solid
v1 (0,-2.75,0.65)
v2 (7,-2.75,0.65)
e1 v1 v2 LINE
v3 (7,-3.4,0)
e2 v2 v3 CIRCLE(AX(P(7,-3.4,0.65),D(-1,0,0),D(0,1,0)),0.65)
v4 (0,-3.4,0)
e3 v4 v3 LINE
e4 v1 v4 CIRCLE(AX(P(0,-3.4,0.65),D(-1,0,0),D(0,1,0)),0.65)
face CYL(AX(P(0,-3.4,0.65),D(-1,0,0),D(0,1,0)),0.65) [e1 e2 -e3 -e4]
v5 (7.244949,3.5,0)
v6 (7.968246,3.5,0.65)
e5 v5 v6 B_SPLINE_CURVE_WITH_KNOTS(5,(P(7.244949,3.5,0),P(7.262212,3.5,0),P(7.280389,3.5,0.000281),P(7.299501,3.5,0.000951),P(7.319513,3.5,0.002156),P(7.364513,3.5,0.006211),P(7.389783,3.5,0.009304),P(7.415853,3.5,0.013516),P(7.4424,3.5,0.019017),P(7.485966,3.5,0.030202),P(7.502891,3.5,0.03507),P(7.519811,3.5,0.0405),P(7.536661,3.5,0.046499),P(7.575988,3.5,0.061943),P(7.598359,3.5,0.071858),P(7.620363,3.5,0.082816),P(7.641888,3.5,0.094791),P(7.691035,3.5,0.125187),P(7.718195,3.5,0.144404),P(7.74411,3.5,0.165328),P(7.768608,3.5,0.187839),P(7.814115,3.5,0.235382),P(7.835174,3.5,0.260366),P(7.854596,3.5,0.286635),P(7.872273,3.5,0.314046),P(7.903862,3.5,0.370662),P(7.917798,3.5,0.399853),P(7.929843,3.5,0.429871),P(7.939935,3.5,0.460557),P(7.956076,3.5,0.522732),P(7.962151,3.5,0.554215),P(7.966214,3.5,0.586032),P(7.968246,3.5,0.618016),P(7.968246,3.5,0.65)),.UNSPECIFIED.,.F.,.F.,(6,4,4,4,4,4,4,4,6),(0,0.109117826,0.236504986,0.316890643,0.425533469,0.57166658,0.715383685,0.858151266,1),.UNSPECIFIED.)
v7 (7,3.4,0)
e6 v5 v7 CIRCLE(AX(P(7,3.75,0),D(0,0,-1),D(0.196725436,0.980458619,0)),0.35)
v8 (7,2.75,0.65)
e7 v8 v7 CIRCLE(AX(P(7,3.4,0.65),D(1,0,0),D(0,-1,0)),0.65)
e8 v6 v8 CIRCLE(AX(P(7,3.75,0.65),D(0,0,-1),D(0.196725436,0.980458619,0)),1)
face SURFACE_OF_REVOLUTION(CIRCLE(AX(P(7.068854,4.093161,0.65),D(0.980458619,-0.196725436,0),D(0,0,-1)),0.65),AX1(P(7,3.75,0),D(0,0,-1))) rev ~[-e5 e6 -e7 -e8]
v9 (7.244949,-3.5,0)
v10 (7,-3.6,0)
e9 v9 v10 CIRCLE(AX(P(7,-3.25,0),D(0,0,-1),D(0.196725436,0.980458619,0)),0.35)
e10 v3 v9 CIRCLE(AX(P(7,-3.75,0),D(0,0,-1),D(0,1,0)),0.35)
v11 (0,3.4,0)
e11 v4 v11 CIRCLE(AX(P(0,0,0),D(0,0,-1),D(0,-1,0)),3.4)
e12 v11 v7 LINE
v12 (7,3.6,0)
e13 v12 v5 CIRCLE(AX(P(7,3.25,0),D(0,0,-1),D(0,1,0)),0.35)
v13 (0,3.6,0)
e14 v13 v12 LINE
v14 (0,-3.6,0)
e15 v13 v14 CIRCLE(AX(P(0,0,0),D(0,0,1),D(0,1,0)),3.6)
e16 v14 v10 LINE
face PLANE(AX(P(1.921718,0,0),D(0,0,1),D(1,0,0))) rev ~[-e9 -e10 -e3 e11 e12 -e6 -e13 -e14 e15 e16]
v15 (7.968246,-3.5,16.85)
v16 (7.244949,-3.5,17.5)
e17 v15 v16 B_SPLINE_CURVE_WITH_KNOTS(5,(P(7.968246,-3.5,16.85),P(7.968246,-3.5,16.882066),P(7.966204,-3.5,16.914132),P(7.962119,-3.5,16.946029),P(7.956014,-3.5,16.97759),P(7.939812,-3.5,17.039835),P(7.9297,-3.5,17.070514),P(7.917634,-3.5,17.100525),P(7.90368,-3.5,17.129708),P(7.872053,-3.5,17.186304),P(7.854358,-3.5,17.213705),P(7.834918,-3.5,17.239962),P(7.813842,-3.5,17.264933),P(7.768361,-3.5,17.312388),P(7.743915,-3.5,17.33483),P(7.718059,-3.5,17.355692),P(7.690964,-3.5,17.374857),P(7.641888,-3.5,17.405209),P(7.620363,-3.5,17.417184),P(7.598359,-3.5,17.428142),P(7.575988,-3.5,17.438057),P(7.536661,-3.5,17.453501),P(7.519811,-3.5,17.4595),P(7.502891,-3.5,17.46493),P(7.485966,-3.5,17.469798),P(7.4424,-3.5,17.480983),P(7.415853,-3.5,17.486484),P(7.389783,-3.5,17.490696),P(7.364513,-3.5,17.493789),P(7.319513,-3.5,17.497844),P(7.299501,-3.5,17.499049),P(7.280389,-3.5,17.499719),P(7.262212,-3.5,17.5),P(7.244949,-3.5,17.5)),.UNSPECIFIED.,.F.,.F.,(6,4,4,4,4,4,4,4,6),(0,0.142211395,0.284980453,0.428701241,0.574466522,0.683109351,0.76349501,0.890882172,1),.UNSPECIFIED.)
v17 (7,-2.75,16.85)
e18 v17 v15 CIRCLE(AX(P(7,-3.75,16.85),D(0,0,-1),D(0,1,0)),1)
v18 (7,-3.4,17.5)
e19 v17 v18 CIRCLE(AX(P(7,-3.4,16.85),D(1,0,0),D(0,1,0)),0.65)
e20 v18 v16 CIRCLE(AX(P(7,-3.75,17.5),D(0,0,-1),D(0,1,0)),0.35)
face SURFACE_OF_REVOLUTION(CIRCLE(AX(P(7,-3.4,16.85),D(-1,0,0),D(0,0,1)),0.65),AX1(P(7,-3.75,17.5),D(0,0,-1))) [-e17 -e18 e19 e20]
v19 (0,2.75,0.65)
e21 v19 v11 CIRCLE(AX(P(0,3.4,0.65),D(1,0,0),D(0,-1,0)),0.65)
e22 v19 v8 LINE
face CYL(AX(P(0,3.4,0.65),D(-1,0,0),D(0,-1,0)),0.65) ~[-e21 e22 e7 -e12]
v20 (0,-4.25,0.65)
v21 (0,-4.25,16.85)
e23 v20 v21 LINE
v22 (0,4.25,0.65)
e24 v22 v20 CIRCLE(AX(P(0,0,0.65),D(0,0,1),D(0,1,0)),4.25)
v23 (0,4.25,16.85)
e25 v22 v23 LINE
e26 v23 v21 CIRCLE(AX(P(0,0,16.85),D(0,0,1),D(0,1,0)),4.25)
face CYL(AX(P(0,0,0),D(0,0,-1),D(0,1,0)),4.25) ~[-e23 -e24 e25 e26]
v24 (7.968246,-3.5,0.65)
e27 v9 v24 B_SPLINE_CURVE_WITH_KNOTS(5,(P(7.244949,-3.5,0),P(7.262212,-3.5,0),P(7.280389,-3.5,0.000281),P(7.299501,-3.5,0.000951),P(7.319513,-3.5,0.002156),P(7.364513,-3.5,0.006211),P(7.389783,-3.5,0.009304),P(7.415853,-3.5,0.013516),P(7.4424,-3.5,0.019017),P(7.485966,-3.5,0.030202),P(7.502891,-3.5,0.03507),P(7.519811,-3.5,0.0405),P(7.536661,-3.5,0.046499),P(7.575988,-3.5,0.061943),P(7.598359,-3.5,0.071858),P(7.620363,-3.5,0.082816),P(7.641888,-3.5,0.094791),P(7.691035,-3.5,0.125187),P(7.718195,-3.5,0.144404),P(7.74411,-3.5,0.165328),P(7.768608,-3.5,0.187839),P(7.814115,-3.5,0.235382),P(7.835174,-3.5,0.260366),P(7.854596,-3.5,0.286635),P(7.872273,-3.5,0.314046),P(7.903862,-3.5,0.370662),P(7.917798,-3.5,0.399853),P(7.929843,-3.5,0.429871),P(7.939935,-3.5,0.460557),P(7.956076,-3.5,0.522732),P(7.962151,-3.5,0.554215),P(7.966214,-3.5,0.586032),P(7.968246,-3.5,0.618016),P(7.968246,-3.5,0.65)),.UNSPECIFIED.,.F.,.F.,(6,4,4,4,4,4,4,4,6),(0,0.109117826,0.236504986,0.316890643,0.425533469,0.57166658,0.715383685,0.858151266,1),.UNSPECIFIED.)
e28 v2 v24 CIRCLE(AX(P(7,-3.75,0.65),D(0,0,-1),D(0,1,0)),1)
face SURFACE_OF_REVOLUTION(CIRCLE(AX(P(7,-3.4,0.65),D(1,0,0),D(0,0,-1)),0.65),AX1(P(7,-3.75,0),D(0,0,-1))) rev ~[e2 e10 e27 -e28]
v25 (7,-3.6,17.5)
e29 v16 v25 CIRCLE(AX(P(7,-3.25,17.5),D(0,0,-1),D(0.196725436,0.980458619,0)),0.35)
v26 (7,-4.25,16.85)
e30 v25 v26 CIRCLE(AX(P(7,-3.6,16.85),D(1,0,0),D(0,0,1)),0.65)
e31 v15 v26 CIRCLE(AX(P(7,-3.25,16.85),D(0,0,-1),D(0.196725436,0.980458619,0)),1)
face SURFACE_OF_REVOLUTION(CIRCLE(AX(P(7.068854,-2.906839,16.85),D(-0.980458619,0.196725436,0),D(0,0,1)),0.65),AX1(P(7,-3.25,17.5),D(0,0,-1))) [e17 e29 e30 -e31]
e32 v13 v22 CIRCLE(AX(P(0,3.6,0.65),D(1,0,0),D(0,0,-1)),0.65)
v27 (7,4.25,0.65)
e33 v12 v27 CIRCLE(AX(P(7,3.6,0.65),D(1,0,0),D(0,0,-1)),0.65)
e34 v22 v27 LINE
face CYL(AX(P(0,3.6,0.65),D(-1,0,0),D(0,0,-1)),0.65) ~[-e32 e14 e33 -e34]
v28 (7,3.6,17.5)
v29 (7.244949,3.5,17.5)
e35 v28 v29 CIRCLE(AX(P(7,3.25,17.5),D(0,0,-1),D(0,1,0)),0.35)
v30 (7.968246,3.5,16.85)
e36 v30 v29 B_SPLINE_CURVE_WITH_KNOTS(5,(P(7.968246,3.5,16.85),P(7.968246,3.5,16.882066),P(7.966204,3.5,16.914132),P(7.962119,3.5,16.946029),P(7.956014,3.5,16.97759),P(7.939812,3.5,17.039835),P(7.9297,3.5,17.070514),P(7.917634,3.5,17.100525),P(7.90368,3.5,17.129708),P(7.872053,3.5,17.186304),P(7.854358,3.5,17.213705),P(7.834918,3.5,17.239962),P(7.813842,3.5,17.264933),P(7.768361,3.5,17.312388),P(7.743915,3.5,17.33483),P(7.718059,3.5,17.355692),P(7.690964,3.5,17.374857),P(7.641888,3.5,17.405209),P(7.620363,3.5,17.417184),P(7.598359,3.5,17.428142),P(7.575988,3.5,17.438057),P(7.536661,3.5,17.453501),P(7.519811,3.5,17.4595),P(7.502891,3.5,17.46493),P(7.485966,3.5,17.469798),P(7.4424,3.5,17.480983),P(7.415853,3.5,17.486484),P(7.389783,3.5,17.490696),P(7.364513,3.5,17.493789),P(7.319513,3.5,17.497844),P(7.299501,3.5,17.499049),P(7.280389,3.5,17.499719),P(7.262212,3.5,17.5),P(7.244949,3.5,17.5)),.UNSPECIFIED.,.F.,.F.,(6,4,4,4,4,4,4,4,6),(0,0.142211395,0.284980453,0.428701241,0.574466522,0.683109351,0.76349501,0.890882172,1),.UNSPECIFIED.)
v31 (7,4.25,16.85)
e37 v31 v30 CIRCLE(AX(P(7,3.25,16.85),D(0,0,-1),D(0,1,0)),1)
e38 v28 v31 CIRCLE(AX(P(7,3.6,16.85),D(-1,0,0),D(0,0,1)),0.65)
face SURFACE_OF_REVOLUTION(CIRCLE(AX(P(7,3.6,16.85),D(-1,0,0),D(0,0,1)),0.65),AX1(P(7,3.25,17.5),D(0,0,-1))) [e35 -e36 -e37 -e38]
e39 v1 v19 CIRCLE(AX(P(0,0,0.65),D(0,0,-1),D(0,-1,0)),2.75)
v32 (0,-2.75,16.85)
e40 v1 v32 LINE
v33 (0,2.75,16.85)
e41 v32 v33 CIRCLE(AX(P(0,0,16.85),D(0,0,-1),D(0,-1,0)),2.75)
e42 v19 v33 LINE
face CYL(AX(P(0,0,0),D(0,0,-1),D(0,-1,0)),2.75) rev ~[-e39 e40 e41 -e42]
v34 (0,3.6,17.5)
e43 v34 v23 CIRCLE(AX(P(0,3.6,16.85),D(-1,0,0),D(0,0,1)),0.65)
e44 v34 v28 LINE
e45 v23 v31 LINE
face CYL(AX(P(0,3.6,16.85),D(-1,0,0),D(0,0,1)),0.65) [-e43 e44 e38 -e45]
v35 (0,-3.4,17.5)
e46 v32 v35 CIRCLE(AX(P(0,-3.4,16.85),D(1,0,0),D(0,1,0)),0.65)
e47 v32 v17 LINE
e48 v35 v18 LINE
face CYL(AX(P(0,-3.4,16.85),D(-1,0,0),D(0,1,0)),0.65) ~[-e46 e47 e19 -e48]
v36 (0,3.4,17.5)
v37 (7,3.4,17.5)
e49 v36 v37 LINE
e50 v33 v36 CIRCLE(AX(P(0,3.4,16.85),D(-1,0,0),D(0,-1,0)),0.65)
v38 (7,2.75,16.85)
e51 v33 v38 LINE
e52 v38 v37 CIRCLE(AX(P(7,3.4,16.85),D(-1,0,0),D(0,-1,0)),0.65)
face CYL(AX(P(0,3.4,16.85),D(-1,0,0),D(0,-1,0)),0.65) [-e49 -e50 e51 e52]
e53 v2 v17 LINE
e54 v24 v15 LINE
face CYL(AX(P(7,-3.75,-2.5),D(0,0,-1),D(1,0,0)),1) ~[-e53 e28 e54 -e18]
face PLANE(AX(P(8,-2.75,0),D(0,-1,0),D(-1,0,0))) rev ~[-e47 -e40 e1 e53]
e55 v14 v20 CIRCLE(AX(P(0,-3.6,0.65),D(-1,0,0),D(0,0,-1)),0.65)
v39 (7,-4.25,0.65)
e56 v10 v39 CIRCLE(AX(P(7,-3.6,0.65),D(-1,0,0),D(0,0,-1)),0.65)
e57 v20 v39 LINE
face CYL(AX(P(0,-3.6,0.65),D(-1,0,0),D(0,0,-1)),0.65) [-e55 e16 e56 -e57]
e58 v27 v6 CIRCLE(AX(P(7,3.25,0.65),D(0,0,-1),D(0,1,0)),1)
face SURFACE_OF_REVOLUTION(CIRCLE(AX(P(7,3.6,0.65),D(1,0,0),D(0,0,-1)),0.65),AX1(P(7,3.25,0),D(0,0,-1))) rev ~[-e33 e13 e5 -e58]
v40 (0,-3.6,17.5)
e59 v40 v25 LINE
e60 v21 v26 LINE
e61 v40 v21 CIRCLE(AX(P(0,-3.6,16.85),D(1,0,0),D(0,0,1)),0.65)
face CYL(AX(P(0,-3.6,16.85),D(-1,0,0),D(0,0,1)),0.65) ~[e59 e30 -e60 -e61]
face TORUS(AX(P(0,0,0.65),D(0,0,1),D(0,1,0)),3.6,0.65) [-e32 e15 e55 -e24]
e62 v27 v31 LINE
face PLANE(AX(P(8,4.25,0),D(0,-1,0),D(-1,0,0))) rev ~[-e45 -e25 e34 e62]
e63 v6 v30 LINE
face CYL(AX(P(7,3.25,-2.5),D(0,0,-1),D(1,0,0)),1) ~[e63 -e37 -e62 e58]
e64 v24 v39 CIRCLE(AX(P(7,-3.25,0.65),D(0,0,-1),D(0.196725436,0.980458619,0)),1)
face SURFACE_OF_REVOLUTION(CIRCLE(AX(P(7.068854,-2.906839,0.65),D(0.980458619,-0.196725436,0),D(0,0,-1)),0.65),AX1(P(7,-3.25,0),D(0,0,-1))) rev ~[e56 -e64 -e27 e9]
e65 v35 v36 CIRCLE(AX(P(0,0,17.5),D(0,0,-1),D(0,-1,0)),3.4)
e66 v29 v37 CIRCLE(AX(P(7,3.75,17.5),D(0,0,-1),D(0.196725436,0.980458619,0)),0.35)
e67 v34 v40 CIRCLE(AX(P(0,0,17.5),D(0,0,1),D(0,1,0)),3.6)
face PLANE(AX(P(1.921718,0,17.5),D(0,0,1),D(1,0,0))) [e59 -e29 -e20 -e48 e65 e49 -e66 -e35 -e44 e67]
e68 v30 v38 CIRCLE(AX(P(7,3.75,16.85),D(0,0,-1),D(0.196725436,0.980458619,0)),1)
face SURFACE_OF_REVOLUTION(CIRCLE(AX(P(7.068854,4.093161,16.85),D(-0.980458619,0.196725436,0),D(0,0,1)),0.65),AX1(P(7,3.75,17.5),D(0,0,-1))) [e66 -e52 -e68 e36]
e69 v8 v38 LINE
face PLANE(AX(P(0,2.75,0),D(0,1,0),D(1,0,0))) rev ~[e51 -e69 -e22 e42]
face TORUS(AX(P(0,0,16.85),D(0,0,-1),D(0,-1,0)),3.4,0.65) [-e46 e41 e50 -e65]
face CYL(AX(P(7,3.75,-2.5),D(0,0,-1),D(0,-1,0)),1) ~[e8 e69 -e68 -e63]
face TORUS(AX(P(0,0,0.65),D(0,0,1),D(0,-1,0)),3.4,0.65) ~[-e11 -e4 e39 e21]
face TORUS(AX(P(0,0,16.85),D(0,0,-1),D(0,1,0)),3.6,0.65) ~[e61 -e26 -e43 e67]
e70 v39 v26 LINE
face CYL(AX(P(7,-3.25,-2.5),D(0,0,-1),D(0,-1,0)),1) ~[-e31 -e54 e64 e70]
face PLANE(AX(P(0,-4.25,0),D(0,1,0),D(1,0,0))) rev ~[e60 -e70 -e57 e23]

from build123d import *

# Parameters (mm, degrees)
F1_DEPTH     = 17.5
F2_T1_DEPTH  = 22.5
F3_T1_DEPTH  = 7
F3_T4_ANGLE  = 168.6544636073
F3_T6_ANGLE  = 168.6544636073
F3_T8_ANGLE  = 180
F3_T10_ANGLE = 168.6544636073
F3_T12_ANGLE = 168.6544636073
F3_T14_ANGLE = 180
F3_T16_ANGLE = 168.6544636073
F3_T18_ANGLE = 168.6544636073
F3_T20_ANGLE = 180
F3_T22_ANGLE = 168.6544636073
F3_T24_ANGLE = 168.6544636073
F3_T26_ANGLE = 180


# Not quite as in the source:
# - a fillet or chamfer that OpenCascade refuses, or shapes differently, is made with other operations: its cross-section is extruded or revolved along the edge and cut away or added


with BuildPart() as f1:
    # F0 (on Top) → F1 (new body)
    with BuildSketch(Plane.XY):
        with BuildLine():
            ThreePointArc((0, -2.75), (-2.75, 0), (0, 2.75))
            Line((0, 2.75), (8, 2.75))
            Line((8, 2.75), (8, 4.25))
            Line((8, 4.25), (0, 4.25))
            ThreePointArc((0, 4.25), (-4.25, 0), (0, -4.25))
            Line((0, -4.25), (8, -4.25))
            Line((8, -4.25), (8, -2.75))
            Line((8, -2.75), (0, -2.75))
        make_face()
    extrude(amount=F1_DEPTH)

    # F2: fillet of radius 1 on 4 edges, made by hand

    # F2_s2 → F2_t1 (cut)
    with BuildSketch(Plane.XY.offset(-2.5)):
        with BuildLine():
            ThreePointArc((8, -3.75), (7.7071067812, -3.0428932188), (7, -2.75))
            Line((7, -2.75), (8, -2.75))
            Line((8, -2.75), (8, -3.75))
        make_face()
        with BuildLine():
            ThreePointArc((7, -4.25), (7.7071067812, -3.9571067812), (8, -3.25))
            Line((8, -3.25), (8, -4.25))
            Line((8, -4.25), (7, -4.25))
        make_face()
        with BuildLine():
            ThreePointArc((7, 2.75), (7.7071067812, 3.0428932188), (8, 3.75))
            Line((8, 3.75), (8, 2.75))
            Line((8, 2.75), (7, 2.75))
        make_face()
        with BuildLine():
            ThreePointArc((8, 3.25), (7.7071067812, 3.9571067812), (7, 4.25))
            Line((7, 4.25), (8, 4.25))
            Line((8, 4.25), (8, 3.25))
        make_face()
    extrude(amount=F2_T1_DEPTH, mode=Mode.SUBTRACT)

    # F3: fillet of radius 0.65 on 20 edges, made by hand

    # F3_s2 → F3_t1 (cut)
    with BuildSketch(Plane.YZ):
        with BuildLine():
            ThreePointArc((-2.75, 0.65), (-2.9403805922, 0.1903805922), (-3.4, 0))
            Line((-3.4, 0), (-2.75, 0))
            Line((-2.75, 0), (-2.75, 0.65))
        make_face()
        with BuildLine():
            ThreePointArc((-3.6, 0), (-4.0596194078, 0.1903805922), (-4.25, 0.65))
            Line((-4.25, 0.65), (-4.25, 0))
            Line((-4.25, 0), (-3.6, 0))
        make_face()
        with BuildLine():
            ThreePointArc((3.6, 0), (4.0596194078, 0.1903805922), (4.25, 0.65))
            Line((4.25, 0.65), (4.25, 0))
            Line((4.25, 0), (3.6, 0))
        make_face()
        with BuildLine():
            ThreePointArc((2.75, 0.65), (2.9403805922, 0.1903805922), (3.4, 0))
            Line((3.4, 0), (2.75, 0))
            Line((2.75, 0), (2.75, 0.65))
        make_face()
        with BuildLine():
            ThreePointArc((-2.75, 16.85), (-2.9403805922, 17.3096194078), (-3.4, 17.5))
            Line((-3.4, 17.5), (-2.75, 17.5))
            Line((-2.75, 17.5), (-2.75, 16.85))
        make_face()
        with BuildLine():
            ThreePointArc((-3.6, 17.5), (-4.0596194078, 17.3096194078), (-4.25, 16.85))
            Line((-4.25, 16.85), (-4.25, 17.5))
            Line((-4.25, 17.5), (-3.6, 17.5))
        make_face()
        with BuildLine():
            ThreePointArc((3.6, 17.5), (4.0596194078, 17.3096194078), (4.25, 16.85))
            Line((4.25, 16.85), (4.25, 17.5))
            Line((4.25, 17.5), (3.6, 17.5))
        make_face()
        with BuildLine():
            ThreePointArc((2.75, 16.85), (2.9403805922, 17.3096194078), (3.4, 17.5))
            Line((3.4, 17.5), (2.75, 17.5))
            Line((2.75, 17.5), (2.75, 16.85))
        make_face()
    extrude(amount=F3_T1_DEPTH, mode=Mode.SUBTRACT)

    # F3_s3 → F3_t4 (revolve, cut)
    with BuildSketch(Plane.YZ.offset(7)):
        with BuildLine():
            ThreePointArc((-3.4, 0), (-2.9403805922, 0.1903805922), (-2.75, 0.65))
            Line((-2.75, 0.65), (-2.75, 0))
            Line((-2.75, 0), (-3.4, 0))
        make_face()
    revolve(axis=Axis((7, -3.75, 0), (0, 0, -1)), revolution_arc=F3_T4_ANGLE, mode=Mode.SUBTRACT)

    # F3_s5 → F3_t6 (revolve, cut)
    with BuildSketch(Plane(origin=(7.3559574547, -1.4759459573, 0), x_dir=(0, 0, 1), z_dir=(-0.9804586187, 0.1967254356, 0))):
        with BuildLine():
            ThreePointArc((0, -1.4594124616), (0.1903805922, -0.9997930538), (0.65, -0.8094124616))
            Line((0.65, -0.8094124616), (0, -0.8094124616))
            Line((0, -0.8094124616), (0, -1.4594124616))
        make_face()
    revolve(axis=Axis((7, -3.25, 0), (0, 0, -1)), revolution_arc=F3_T6_ANGLE, mode=Mode.SUBTRACT)

    # F3_s7 → F3_t8 (revolve, cut)
    with BuildSketch(Plane.YZ):
        with BuildLine():
            ThreePointArc((3.6, 0), (4.0596194078, 0.1903805922), (4.25, 0.65))
            Line((4.25, 0.65), (4.25, 0))
            Line((4.25, 0), (3.6, 0))
        make_face()
    revolve(axis=Axis((0, 0, 0), (0, 0, 1)), revolution_arc=F3_T8_ANGLE, mode=Mode.SUBTRACT)

    # F3_s9 → F3_t10 (revolve, cut)
    with BuildSketch(Plane.YZ.offset(7)):
        with BuildLine():
            ThreePointArc((3.6, 0), (4.0596194078, 0.1903805922), (4.25, 0.65))
            Line((4.25, 0.65), (4.25, 0))
            Line((4.25, 0), (3.6, 0))
        make_face()
    revolve(axis=Axis((7, 3.25, 0), (0, 0, -1)), revolution_arc=F3_T10_ANGLE, mode=Mode.SUBTRACT)

    # F3_s11 → F3_t12 (revolve, cut)
    with BuildSketch(Plane(origin=(6.0057894127, -1.2050396782, 0), x_dir=(0, 0, 1), z_dir=(-0.9804586187, 0.1967254356, 0))):
        with BuildLine():
            ThreePointArc((0, 5.4037978693), (0.1903805922, 5.8634172771), (0.65, 6.0537978693))
            Line((0.65, 6.0537978693), (0, 6.0537978693))
            Line((0, 6.0537978693), (0, 5.4037978693))
        make_face()
    revolve(axis=Axis((7, 3.75, 0), (0, 0, -1)), revolution_arc=F3_T12_ANGLE, mode=Mode.SUBTRACT)

    # F3_s13 → F3_t14 (revolve, cut)
    with BuildSketch(Plane.YZ):
        with BuildLine():
            ThreePointArc((-2.75, 0.65), (-2.9403805922, 0.1903805922), (-3.4, 0))
            Line((-3.4, 0), (-2.75, 0))
            Line((-2.75, 0), (-2.75, 0.65))
        make_face()
    revolve(axis=Axis((0, 0, 0), (0, 0, -1)), revolution_arc=F3_T14_ANGLE, mode=Mode.SUBTRACT)

    # F3_s15 → F3_t16 (revolve, cut)
    with BuildSketch(Plane.YZ.offset(7)):
        with BuildLine():
            ThreePointArc((-3.4, 17.5), (-2.9403805922, 17.3096194078), (-2.75, 16.85))
            Line((-2.75, 16.85), (-2.75, 17.5))
            Line((-2.75, 17.5), (-3.4, 17.5))
        make_face()
    revolve(axis=Axis((7, -3.75, 17.5), (0, 0, -1)), revolution_arc=F3_T16_ANGLE, mode=Mode.SUBTRACT)

    # F3_s17 → F3_t18 (revolve, cut)
    with BuildSketch(Plane(origin=(7.3559574547, -1.4759459573, 0), x_dir=(0, 0, 1), z_dir=(-0.9804586187, 0.1967254356, 0))):
        with BuildLine():
            ThreePointArc((17.5, -1.4594124616), (17.3096194078, -0.9997930538), (16.85, -0.8094124616))
            Line((16.85, -0.8094124616), (17.5, -0.8094124616))
            Line((17.5, -0.8094124616), (17.5, -1.4594124616))
        make_face()
    revolve(axis=Axis((7, -3.25, 17.5), (0, 0, -1)), revolution_arc=F3_T18_ANGLE, mode=Mode.SUBTRACT)

    # F3_s19 → F3_t20 (revolve, cut)
    with BuildSketch(Plane.YZ):
        with BuildLine():
            ThreePointArc((3.6, 17.5), (4.0596194078, 17.3096194078), (4.25, 16.85))
            Line((4.25, 16.85), (4.25, 17.5))
            Line((4.25, 17.5), (3.6, 17.5))
        make_face()
    revolve(axis=Axis((0, 0, 17.5), (0, 0, 1)), revolution_arc=F3_T20_ANGLE, mode=Mode.SUBTRACT)

    # F3_s21 → F3_t22 (revolve, cut)
    with BuildSketch(Plane.YZ.offset(7)):
        with BuildLine():
            ThreePointArc((3.6, 17.5), (4.0596194078, 17.3096194078), (4.25, 16.85))
            Line((4.25, 16.85), (4.25, 17.5))
            Line((4.25, 17.5), (3.6, 17.5))
        make_face()
    revolve(axis=Axis((7, 3.25, 17.5), (0, 0, -1)), revolution_arc=F3_T22_ANGLE, mode=Mode.SUBTRACT)

    # F3_s23 → F3_t24 (revolve, cut)
    with BuildSketch(Plane(origin=(6.0057894127, -1.2050396782, 0), x_dir=(0, 0, 1), z_dir=(-0.9804586187, 0.1967254356, 0))):
        with BuildLine():
            ThreePointArc((17.5, 5.4037978693), (17.3096194078, 5.8634172771), (16.85, 6.0537978693))
            Line((16.85, 6.0537978693), (17.5, 6.0537978693))
            Line((17.5, 6.0537978693), (17.5, 5.4037978693))
        make_face()
    revolve(axis=Axis((7, 3.75, 17.5), (0, 0, -1)), revolution_arc=F3_T24_ANGLE, mode=Mode.SUBTRACT)

    # F3_s25 → F3_t26 (revolve, cut)
    with BuildSketch(Plane.YZ):
        with BuildLine():
            ThreePointArc((-2.75, 16.85), (-2.9403805922, 17.3096194078), (-3.4, 17.5))
            Line((-3.4, 17.5), (-2.75, 17.5))
            Line((-2.75, 17.5), (-2.75, 16.85))
        make_face()
    revolve(axis=Axis((0, 0, 17.5), (0, 0, -1)), revolution_arc=F3_T26_ANGLE, mode=Mode.SUBTRACT)


solid = f1.part
